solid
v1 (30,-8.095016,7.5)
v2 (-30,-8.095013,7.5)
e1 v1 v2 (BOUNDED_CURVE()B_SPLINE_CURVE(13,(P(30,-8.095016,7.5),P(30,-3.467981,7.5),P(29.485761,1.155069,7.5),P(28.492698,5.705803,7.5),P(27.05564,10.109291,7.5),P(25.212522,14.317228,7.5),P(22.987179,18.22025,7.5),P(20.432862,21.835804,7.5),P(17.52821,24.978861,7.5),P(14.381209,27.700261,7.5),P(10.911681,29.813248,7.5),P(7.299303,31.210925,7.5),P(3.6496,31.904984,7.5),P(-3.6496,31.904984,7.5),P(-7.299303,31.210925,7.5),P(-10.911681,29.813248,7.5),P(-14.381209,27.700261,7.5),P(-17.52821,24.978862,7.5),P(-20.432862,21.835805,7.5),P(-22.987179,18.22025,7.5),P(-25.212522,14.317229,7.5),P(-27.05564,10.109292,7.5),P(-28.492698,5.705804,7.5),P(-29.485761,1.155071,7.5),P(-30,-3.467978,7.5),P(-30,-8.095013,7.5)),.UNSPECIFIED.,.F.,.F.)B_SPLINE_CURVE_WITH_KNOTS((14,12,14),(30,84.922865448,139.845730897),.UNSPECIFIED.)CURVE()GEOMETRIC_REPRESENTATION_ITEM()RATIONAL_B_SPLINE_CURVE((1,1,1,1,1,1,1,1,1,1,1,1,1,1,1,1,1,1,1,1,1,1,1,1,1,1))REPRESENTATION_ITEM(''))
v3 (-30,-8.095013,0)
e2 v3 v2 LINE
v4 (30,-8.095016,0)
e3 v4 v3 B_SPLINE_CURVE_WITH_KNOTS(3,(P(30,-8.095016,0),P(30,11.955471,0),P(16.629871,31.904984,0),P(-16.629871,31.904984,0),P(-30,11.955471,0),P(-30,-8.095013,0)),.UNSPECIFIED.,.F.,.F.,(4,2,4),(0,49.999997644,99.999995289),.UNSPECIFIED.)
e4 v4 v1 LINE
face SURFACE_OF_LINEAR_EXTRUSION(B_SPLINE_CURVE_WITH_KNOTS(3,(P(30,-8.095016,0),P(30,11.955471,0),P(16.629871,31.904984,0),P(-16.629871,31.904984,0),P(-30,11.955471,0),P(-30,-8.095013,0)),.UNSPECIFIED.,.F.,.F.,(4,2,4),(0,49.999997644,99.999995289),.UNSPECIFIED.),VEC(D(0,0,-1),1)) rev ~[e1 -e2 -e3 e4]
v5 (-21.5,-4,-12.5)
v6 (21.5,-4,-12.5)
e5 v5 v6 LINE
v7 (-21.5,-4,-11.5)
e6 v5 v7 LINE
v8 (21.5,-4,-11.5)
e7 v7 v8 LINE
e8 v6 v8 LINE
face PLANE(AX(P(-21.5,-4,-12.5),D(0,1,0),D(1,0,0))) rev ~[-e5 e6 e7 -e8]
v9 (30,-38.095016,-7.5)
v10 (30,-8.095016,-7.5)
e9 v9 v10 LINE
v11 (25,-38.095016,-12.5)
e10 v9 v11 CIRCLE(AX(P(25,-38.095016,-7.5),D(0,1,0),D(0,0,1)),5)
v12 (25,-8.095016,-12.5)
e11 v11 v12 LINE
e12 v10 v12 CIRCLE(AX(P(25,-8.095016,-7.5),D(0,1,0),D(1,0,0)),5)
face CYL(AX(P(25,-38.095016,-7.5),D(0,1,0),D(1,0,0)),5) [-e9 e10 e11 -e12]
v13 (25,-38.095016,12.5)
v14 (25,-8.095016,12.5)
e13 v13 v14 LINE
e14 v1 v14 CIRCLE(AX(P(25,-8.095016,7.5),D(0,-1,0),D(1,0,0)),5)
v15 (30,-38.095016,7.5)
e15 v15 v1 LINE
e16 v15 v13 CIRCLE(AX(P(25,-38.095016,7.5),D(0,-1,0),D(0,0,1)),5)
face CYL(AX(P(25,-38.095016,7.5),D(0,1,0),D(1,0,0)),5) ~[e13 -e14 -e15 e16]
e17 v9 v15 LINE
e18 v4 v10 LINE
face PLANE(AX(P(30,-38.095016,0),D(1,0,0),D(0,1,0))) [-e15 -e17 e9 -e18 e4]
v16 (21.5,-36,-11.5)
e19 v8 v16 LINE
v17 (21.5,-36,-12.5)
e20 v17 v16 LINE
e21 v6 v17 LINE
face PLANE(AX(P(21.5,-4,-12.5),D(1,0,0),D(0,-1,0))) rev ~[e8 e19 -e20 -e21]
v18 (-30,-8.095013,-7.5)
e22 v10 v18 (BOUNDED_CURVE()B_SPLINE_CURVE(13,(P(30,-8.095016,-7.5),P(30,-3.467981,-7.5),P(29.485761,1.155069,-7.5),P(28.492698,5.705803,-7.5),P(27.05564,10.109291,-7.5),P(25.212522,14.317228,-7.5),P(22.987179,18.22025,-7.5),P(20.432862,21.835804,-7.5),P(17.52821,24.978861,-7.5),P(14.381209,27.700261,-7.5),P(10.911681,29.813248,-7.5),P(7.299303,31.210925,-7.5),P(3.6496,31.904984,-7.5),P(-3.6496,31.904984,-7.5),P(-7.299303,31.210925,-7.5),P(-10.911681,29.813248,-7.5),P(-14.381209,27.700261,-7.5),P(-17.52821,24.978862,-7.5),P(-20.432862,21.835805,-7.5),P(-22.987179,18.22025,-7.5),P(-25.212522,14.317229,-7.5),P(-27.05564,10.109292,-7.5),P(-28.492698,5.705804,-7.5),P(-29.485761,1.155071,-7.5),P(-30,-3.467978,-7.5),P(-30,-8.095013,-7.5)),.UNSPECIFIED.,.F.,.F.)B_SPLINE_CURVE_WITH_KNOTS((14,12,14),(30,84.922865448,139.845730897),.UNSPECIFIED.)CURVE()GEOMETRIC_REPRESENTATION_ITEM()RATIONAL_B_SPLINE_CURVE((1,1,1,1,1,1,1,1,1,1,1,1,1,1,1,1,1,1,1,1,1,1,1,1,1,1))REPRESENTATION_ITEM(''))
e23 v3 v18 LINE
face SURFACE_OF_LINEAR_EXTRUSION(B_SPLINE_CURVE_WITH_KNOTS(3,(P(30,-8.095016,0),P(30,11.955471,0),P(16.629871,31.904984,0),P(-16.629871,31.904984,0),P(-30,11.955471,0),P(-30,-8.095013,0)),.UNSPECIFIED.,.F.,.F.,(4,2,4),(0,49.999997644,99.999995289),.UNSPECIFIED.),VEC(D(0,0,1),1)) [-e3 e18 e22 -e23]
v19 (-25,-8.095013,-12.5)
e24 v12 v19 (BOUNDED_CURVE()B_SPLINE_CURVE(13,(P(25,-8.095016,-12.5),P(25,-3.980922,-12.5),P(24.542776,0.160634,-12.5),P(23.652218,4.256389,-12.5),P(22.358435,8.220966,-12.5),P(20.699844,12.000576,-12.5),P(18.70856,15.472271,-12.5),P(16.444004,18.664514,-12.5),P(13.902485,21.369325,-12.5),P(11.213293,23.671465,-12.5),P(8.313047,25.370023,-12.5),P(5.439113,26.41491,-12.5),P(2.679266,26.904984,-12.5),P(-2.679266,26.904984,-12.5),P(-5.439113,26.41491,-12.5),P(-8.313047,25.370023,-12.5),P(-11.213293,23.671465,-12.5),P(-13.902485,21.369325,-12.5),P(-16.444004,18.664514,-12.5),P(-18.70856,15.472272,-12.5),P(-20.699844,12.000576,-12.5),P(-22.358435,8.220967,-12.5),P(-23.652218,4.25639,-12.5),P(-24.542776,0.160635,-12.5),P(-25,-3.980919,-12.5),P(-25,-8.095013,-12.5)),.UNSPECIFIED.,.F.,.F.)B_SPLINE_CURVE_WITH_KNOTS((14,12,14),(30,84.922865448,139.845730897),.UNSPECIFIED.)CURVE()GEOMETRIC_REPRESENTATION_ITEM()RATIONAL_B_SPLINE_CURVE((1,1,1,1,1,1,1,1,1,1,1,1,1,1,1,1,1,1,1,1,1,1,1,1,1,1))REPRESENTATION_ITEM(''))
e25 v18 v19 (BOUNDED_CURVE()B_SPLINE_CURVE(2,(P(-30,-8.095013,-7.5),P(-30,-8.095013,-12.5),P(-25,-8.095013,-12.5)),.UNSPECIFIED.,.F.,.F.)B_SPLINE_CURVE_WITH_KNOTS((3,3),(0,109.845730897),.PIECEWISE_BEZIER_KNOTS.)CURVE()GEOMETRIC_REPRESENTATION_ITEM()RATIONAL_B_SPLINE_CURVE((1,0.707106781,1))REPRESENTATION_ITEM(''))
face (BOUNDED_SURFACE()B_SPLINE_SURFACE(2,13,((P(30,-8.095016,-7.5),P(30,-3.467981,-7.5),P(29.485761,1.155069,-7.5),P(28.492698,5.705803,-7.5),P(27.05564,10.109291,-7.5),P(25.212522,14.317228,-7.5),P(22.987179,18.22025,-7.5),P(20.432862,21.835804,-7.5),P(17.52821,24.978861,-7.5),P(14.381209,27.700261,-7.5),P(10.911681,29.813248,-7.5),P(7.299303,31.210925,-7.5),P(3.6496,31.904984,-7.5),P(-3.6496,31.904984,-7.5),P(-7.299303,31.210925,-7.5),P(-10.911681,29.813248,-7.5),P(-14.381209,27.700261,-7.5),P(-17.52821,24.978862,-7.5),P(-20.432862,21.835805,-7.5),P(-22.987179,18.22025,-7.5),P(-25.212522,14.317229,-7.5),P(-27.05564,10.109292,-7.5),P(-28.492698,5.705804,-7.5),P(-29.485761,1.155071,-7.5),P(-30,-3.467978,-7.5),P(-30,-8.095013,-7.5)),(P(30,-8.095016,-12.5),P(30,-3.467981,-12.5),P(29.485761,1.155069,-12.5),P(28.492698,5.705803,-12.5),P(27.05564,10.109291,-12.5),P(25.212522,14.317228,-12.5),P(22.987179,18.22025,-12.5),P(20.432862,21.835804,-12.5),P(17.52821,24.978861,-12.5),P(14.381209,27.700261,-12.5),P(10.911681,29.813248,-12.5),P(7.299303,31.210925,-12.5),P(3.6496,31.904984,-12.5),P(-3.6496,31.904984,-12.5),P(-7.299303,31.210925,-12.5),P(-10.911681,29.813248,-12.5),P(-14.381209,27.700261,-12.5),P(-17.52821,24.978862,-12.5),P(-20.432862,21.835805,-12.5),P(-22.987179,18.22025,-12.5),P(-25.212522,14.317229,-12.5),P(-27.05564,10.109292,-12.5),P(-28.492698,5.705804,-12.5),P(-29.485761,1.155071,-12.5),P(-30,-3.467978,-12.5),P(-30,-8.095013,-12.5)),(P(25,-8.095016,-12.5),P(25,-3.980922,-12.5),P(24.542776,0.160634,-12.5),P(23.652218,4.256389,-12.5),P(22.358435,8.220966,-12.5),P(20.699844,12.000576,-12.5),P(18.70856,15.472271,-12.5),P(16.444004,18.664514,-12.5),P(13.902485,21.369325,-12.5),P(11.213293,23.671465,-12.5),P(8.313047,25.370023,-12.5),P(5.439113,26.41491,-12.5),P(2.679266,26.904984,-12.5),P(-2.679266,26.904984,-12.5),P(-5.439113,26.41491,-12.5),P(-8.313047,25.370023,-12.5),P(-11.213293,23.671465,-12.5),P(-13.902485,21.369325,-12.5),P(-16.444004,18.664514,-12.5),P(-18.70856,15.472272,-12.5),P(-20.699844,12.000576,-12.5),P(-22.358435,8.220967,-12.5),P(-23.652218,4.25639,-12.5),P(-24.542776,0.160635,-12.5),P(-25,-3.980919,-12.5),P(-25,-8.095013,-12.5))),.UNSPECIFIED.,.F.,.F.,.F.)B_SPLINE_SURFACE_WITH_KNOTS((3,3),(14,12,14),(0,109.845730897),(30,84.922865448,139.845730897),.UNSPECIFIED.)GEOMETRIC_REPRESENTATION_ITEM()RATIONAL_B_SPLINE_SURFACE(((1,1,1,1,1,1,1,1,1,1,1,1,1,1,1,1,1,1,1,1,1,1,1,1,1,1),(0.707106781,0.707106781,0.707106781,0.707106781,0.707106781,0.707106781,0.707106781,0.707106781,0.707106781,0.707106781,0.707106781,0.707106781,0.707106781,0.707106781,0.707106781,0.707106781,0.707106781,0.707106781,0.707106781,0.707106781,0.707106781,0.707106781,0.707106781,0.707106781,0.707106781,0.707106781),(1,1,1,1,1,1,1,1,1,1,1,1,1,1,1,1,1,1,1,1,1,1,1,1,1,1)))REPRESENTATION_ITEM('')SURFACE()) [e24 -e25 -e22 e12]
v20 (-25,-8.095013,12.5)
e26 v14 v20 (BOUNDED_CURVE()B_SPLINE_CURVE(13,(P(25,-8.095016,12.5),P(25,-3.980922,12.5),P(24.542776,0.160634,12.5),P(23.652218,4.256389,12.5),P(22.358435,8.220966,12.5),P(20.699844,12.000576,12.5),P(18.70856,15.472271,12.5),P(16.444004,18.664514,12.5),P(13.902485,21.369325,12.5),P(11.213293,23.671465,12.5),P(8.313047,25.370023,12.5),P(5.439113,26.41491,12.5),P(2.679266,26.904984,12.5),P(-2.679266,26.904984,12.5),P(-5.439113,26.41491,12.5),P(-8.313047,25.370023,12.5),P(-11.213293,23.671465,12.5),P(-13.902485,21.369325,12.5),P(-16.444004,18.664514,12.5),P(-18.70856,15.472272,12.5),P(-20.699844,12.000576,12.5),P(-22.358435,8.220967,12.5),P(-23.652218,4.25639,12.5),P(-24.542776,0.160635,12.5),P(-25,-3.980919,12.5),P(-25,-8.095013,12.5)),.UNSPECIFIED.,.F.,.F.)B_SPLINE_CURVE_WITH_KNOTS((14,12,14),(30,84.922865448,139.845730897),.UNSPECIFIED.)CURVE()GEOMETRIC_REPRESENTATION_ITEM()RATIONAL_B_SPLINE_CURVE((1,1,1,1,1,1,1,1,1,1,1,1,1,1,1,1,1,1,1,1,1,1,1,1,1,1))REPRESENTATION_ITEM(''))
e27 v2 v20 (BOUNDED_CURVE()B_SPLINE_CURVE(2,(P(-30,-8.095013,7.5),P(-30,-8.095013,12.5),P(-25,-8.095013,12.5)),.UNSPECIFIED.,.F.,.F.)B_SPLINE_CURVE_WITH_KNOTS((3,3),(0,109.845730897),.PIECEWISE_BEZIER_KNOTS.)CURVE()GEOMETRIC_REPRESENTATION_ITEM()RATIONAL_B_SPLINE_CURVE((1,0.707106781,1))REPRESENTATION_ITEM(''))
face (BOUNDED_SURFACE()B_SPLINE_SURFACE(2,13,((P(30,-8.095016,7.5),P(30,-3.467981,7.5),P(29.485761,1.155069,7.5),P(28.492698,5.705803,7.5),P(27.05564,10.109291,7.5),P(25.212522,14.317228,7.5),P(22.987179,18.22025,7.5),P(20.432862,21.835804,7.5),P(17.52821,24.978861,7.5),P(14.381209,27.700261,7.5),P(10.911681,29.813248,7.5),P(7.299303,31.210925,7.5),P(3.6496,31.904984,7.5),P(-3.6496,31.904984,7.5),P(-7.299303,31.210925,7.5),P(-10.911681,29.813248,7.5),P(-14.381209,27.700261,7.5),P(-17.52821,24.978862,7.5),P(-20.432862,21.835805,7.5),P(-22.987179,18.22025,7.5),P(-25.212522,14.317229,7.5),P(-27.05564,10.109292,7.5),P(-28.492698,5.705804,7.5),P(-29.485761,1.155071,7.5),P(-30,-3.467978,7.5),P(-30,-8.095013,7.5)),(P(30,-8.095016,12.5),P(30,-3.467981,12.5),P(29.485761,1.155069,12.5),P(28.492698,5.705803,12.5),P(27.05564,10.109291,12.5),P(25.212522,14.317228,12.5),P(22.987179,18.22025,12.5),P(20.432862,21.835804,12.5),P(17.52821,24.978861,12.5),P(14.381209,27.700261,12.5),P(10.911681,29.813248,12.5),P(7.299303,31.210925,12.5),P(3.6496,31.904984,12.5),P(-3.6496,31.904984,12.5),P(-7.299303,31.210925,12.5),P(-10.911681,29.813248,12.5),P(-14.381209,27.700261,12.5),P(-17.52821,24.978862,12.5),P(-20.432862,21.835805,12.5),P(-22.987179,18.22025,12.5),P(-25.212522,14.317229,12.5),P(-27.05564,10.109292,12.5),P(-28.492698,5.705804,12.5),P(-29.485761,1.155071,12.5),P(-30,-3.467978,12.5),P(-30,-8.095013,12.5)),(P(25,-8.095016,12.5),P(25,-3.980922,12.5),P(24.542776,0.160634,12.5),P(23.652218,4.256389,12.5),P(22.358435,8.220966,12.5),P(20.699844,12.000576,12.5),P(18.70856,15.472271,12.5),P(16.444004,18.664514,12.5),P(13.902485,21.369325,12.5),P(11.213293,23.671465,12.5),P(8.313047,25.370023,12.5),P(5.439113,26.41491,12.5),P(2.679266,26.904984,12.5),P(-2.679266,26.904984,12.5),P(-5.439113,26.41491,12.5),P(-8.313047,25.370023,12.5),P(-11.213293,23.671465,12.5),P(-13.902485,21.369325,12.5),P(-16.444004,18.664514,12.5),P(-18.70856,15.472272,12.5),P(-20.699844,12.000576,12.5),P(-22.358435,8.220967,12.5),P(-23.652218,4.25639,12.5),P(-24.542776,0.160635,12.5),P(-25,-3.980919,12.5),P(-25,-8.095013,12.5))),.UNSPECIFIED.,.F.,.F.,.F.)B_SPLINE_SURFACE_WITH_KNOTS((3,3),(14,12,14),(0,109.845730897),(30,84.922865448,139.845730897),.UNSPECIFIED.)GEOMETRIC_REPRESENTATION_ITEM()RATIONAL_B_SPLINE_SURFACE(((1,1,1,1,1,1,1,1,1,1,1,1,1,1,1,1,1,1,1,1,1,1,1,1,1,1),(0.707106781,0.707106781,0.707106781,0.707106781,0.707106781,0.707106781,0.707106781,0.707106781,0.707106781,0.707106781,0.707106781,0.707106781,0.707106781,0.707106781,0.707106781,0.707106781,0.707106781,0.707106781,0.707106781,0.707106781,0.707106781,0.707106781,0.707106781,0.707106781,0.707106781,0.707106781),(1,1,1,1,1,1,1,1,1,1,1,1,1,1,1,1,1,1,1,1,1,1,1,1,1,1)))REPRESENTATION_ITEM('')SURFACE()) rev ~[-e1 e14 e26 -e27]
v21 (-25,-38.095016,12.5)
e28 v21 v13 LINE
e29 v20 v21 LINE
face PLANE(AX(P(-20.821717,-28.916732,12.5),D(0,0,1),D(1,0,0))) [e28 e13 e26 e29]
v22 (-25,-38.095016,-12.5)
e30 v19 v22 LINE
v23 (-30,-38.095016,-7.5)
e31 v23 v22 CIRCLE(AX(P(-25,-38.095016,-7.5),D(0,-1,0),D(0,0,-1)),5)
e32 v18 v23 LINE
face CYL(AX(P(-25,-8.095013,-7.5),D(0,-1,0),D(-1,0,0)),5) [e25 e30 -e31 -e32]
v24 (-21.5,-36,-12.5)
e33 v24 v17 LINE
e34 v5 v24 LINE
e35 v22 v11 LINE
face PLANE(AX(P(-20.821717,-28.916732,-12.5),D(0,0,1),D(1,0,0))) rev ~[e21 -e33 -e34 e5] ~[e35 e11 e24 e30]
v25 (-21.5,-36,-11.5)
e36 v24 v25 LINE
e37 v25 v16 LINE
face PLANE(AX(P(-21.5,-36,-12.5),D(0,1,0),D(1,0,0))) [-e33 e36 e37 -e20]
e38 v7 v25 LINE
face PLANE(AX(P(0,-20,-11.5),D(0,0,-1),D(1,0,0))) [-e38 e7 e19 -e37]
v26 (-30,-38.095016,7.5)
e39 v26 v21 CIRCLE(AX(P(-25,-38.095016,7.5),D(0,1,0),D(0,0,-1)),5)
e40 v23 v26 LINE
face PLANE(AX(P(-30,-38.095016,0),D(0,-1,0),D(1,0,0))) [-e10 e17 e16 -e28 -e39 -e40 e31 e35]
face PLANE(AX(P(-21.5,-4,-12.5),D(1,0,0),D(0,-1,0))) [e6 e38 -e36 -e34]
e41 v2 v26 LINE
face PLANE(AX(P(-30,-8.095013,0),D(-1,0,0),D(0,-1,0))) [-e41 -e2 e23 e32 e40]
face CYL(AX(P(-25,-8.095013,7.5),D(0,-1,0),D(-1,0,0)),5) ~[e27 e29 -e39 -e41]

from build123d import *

# Parameters (mm, degrees)
F1_DEPTH = 12.5
F2_R     = 5
F3_W     = 43
F3_H     = 32
F4_DEPTH = 1


# Not quite as in the source:
# - ends of sketch curves that miss each other by under 0.0002 mm in the source are joined


with BuildPart() as f1:
    # F0 (on Top) → F1 (new body, symmetric)
    with BuildSketch(Plane.XY):
        with BuildLine():
            Line((-30, -8.0950134536), (-30, -38.0950163982))
            Line((-30, -38.0950163982), (0, -38.0950163982))
            ThreePointArc((0, -38.0950163982), (-21.2132044767, -29.3082187928), (-30, -8.0950134536))
        make_face()
        with BuildLine():
            ThreePointArc((30, -8.0950163982), (21.2132034356, -29.3082198338), (0, -38.0950163982))
            Line((0, -38.0950163982), (30, -38.0950163982))
            Line((30, -38.0950163982), (30, -8.0950163982))
        make_face()
        with BuildLine():
            ThreePointArc((-30, -8.0950134536), (-21.2132044767, -29.3082187928), (0, -38.0950163982))
            ThreePointArc((0, -38.0950163982), (21.2132034356, -29.3082198338), (30, -8.0950163982))
            ThreePointArc((30, -8.0950163982), (1.4723e-06, 21.9049836018), (-30, -8.0950134536))
        make_face()
        with BuildLine():
            add(Edge.make_bspline(
                [(0, 31.9049836018), (-16.629870981, 31.9049836018), (-30, 11.955471457), (-30, -8.0950134536)],
                knots=[0, 0, 0, 0, 49.9999976443, 49.9999976443, 49.9999976443, 49.9999976443], degree=3))
            ThreePointArc((-30, -8.0950134536), (1.4723e-06, 21.9049836018), (30, -8.0950163982))
            add(Edge.make_bspline(
                [(0, 31.9049836018), (16.629870981, 31.9049836018), (30, 11.955471457), (30, -8.0950163982)],
                knots=[0, 0, 0, 0, 49.9999976443, 49.9999976443, 49.9999976443, 49.9999976443], degree=3))
        make_face()
    extrude(amount=F1_DEPTH, both=True)

    # F2
    f2_edges = [f1.edges().sort_by_distance(p)[0] for p in [
        (30, -23.095016, -12.5),
        (30, -23.095016, 12.5),
        (-30, -23.095015, 12.5),
        (-30, -23.095015, -12.5),
    ]]
    fillet(f2_edges, radius=F2_R)

    # F3 (on face) → F4 (cut)
    with BuildSketch(Plane(origin=(0, 0, -12.5), x_dir=(1, 0, 0), z_dir=(0, 0, -1))):
        with Locations((0, 20)):
            Rectangle(F3_W, F3_H)
    extrude(amount=-F4_DEPTH, mode=Mode.SUBTRACT)


solid = f1.part
